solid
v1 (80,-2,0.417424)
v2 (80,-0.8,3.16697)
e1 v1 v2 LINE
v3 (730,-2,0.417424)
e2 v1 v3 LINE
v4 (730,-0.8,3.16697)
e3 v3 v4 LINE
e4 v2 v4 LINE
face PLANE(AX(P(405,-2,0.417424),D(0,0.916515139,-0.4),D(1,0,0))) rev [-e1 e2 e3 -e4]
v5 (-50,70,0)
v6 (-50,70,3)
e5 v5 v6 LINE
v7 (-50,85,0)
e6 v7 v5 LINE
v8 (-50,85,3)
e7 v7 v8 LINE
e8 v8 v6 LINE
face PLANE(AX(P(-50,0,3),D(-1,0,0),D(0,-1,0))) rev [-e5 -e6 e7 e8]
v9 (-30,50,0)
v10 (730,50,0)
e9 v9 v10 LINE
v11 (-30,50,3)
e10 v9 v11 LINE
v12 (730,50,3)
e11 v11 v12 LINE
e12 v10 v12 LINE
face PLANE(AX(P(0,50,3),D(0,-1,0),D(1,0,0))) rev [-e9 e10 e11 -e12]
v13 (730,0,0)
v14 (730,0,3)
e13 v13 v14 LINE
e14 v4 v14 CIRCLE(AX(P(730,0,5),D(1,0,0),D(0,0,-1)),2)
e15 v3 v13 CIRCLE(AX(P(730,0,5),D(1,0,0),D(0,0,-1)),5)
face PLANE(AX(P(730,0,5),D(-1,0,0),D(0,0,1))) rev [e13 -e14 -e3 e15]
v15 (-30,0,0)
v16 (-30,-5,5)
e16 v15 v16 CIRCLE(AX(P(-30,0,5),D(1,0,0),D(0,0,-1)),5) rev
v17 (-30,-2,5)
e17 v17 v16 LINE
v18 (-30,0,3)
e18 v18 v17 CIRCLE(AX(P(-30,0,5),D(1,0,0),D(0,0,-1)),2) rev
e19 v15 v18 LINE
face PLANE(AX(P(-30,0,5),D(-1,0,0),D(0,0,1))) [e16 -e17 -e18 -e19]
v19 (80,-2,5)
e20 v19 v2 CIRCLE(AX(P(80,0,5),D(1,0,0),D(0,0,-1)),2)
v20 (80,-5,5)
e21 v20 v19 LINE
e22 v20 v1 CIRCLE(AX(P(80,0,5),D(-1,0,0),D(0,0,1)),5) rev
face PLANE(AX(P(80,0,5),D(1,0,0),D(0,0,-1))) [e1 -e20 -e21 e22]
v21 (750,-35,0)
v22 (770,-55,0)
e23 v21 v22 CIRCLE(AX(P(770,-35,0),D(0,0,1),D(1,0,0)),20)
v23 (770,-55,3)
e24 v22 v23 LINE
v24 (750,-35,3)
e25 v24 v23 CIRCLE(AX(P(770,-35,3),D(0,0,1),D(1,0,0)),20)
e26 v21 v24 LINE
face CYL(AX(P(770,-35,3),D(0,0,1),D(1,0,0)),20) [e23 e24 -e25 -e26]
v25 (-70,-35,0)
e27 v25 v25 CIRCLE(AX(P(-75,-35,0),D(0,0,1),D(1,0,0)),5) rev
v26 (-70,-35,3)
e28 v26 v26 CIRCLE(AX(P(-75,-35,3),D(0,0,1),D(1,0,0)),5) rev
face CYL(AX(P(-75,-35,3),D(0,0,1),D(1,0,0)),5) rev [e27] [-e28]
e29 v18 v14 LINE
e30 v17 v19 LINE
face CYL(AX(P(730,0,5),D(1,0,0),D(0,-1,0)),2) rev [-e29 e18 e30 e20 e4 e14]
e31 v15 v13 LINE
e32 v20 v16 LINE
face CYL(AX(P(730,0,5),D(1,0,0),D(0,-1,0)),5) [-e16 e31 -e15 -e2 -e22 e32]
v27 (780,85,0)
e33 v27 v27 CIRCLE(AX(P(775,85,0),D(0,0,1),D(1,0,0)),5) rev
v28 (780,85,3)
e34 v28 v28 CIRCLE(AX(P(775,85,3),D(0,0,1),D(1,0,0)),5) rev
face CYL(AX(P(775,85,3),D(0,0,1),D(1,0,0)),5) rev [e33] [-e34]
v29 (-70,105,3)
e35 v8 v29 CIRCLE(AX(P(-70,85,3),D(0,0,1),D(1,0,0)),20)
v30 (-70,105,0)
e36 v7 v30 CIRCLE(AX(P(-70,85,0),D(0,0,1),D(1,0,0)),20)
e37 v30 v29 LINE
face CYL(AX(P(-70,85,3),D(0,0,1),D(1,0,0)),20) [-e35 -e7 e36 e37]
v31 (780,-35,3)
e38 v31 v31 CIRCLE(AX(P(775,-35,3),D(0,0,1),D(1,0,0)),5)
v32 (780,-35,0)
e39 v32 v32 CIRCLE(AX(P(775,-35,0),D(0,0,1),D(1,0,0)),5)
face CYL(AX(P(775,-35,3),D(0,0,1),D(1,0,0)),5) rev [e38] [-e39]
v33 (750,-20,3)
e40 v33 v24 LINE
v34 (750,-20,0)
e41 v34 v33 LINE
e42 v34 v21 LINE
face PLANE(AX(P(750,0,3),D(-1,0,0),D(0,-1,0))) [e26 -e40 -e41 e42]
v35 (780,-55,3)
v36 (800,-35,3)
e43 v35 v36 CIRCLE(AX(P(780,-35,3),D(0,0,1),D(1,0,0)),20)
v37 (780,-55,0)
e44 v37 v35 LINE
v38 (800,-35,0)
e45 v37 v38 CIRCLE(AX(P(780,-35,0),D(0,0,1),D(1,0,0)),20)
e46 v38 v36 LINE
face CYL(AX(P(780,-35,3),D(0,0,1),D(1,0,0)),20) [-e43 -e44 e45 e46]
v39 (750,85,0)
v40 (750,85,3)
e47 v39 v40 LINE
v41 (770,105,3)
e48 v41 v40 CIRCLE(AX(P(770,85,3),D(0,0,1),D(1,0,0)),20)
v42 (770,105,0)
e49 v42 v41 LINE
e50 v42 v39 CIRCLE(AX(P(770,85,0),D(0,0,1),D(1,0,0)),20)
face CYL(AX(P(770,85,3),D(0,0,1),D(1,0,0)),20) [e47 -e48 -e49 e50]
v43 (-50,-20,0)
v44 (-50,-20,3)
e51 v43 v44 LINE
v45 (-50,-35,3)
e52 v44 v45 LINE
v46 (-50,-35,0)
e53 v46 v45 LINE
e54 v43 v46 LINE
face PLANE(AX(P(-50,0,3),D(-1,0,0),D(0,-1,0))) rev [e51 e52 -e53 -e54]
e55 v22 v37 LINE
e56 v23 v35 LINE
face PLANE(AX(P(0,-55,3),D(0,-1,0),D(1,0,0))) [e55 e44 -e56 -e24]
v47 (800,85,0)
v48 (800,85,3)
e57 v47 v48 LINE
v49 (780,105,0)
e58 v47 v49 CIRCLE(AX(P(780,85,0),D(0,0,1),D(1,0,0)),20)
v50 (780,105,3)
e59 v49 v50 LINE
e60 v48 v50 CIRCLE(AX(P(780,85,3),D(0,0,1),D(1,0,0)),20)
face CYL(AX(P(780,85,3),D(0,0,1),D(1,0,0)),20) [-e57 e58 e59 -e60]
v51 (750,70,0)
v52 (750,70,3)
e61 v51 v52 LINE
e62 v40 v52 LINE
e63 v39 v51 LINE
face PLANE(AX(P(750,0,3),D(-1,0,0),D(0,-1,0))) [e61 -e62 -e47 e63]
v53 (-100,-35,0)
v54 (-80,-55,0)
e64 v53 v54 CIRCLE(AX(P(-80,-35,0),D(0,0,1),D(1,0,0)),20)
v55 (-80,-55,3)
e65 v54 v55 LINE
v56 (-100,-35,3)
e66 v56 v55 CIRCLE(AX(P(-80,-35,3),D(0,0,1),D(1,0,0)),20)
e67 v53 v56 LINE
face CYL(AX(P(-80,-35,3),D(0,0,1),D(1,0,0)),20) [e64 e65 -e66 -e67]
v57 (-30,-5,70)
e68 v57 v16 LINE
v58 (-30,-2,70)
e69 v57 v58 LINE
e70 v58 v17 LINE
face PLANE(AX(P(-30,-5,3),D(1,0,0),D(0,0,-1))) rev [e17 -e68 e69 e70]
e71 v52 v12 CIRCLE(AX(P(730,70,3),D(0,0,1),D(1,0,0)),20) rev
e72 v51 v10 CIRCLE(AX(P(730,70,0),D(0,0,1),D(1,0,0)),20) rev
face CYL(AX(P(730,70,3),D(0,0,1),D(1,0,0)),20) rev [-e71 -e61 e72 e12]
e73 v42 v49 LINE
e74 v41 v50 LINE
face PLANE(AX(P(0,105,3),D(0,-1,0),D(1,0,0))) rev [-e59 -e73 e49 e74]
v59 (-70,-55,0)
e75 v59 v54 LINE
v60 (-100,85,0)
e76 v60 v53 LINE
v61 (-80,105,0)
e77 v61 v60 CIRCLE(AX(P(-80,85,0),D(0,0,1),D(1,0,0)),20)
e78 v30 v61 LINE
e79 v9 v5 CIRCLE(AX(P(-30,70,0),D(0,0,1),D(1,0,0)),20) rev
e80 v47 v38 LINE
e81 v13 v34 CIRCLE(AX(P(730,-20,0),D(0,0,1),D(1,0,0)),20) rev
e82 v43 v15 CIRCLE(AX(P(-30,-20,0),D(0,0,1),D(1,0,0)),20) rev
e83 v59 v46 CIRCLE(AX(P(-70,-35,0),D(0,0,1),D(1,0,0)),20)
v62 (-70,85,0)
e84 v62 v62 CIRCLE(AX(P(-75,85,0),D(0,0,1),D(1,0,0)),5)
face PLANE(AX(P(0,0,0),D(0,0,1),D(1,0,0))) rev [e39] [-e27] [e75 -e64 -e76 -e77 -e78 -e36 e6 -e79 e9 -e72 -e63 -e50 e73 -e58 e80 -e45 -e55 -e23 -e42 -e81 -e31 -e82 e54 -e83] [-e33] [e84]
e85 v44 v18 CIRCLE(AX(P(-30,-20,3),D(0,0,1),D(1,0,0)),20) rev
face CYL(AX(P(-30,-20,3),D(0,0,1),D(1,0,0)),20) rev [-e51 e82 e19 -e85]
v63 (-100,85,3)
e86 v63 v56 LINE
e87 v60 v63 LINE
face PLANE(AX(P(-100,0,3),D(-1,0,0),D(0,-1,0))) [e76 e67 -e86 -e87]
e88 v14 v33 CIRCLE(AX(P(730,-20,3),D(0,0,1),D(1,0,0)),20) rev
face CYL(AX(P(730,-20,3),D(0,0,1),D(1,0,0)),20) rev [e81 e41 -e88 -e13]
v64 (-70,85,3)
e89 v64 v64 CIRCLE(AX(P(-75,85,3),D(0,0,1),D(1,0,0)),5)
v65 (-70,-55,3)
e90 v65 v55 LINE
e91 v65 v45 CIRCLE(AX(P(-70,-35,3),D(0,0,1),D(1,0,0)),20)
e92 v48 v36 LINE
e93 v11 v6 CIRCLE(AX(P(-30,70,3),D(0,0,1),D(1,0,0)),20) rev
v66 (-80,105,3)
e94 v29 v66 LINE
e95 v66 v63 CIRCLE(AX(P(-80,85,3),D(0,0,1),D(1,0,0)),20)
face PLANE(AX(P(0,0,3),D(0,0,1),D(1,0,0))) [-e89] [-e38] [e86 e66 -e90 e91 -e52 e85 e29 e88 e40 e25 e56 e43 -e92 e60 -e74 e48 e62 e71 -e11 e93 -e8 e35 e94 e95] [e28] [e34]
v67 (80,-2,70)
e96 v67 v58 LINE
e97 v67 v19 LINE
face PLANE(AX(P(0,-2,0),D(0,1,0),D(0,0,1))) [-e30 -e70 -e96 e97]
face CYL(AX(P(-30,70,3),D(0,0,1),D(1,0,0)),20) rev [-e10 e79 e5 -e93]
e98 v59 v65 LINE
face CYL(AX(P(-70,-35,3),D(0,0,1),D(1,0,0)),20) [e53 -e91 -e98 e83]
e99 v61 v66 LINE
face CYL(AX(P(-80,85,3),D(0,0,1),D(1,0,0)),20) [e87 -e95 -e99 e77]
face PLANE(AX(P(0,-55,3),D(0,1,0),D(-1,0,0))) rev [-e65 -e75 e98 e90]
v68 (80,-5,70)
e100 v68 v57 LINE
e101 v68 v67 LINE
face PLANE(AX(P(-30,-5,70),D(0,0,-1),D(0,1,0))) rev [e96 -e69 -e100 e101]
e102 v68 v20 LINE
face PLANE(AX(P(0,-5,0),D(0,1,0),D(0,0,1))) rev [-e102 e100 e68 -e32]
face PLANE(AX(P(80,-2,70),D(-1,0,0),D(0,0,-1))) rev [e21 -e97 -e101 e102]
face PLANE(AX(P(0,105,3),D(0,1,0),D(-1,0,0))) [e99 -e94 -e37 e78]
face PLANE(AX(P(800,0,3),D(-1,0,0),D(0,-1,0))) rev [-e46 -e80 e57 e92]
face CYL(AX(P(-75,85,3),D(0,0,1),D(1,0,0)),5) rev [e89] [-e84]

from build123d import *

# Parameters (mm, degrees)
SKETCH1_W           = 700
SKETCH1_H           = 50
SKETCH1_W_2         = 50
SKETCH1_R           = 5
SKETCH1_H_2         = 160
BOSS_EXTRUDE1_DEPTH = 3
FILLET1_R           = 20
EDGE_FLANGE1_DEPTH  = 760
CUT_EXTRUDE1_START  = 80
CUT_EXTRUDE1_DEPTH  = 650


# Read off the part's stored shape, not the designer's step: Cut-Extrude1
# Sheet-metal steps are written as plain solids
with BuildPart() as part:
    # Sketch1 → Boss-Extrude1 (new body)
    # profile 1 of 5: a face of its own
    with BuildSketch(Plane.XY):
        with Locations((350, 25)):
            Rectangle(SKETCH1_W, SKETCH1_H)
    # profile 2 of 5: a face of its own
    with BuildSketch(Plane.XY):
        with Locations((-25, 25)):
            Rectangle(SKETCH1_W_2, SKETCH1_H)
    # profile 3 of 5: a face of its own
    with BuildSketch(Plane.XY):
        Polygon((-50, -55), (-50, 0), (-50, 50), (-50, 105), (-100, 105), (-100, -55), align=None)
        with Locations((-75, -35)):
            Circle(SKETCH1_R, mode=Mode.SUBTRACT)
        with Locations((-75, 85)):
            Circle(SKETCH1_R, mode=Mode.SUBTRACT)
    # profile 4 of 5: a face of its own
    with BuildSketch(Plane.XY):
        with Locations((775, 25)):
            Rectangle(SKETCH1_W_2, SKETCH1_H_2)
        with Locations((775, -35)):
            Circle(SKETCH1_R, mode=Mode.SUBTRACT)
        with Locations((775, 85)):
            Circle(SKETCH1_R, mode=Mode.SUBTRACT)
    # profile 5 of 5: a face of its own
    with BuildSketch(Plane.XY):
        with Locations((725, 25)):
            Rectangle(SKETCH1_W_2, SKETCH1_H)
    extrude(amount=BOSS_EXTRUDE1_DEPTH)

    # Fillet1
    fillet1_edges = [part.edges().sort_by_distance(p)[0] for p in [
        (-50, 0, 1.5),
        (-50, -55, 1.5),
        (-100, -55, 1.5),
        (-100, 105, 1.5),
        (-50, 105, 1.5),
        (-50, 50, 1.5),
        (750, 50, 1.5),
        (750, 105, 1.5),
        (800, 105, 1.5),
        (800, -55, 1.5),
        (750, -55, 1.5),
        (750, 0, 1.5),
    ]]
    fillet(fillet1_edges, radius=FILLET1_R)

    # Edge-Flange1 section (across the edge) → Edge-Flange1 (add)
    with BuildSketch(Plane(origin=(-30, -2, 3), x_dir=(0, 1, 0), z_dir=(1, 0, 0))):
        with BuildLine():
            Line((-3, 2), (-3, 67))
            Line((-3, 67), (0, 67))
            Line((0, 67), (0, 2))
            ThreePointArc((0, 2), (0.585786438, 0.585786438), (2, 0))
            Line((2, 0), (2, -3))
            ThreePointArc((2, -3), (-1.535533906, -1.535533906), (-3, 2))
        make_face()
    extrude(amount=EDGE_FLANGE1_DEPTH)

    # Cut-Extrude1 outline → Cut-Extrude1 (cut)
    with BuildSketch(Plane.YZ.offset(CUT_EXTRUDE1_START)):
        with BuildLine():
            ThreePointArc((-5, 5), (-4.183300133, 2.261387212), (-2, 0.417424305))
            Line((-2, 0.417424305), (-0.8, 3.166969722))
            ThreePointArc((-0.8, 3.166969722), (-1.673320053, 3.904554885), (-2, 5))
            Line((-2, 5), (-2, 70))
            Line((-2, 70), (-5, 70))
            Line((-5, 70), (-5, 5))
        make_face()
    extrude(amount=CUT_EXTRUDE1_DEPTH, mode=Mode.SUBTRACT)


solid = part.part
